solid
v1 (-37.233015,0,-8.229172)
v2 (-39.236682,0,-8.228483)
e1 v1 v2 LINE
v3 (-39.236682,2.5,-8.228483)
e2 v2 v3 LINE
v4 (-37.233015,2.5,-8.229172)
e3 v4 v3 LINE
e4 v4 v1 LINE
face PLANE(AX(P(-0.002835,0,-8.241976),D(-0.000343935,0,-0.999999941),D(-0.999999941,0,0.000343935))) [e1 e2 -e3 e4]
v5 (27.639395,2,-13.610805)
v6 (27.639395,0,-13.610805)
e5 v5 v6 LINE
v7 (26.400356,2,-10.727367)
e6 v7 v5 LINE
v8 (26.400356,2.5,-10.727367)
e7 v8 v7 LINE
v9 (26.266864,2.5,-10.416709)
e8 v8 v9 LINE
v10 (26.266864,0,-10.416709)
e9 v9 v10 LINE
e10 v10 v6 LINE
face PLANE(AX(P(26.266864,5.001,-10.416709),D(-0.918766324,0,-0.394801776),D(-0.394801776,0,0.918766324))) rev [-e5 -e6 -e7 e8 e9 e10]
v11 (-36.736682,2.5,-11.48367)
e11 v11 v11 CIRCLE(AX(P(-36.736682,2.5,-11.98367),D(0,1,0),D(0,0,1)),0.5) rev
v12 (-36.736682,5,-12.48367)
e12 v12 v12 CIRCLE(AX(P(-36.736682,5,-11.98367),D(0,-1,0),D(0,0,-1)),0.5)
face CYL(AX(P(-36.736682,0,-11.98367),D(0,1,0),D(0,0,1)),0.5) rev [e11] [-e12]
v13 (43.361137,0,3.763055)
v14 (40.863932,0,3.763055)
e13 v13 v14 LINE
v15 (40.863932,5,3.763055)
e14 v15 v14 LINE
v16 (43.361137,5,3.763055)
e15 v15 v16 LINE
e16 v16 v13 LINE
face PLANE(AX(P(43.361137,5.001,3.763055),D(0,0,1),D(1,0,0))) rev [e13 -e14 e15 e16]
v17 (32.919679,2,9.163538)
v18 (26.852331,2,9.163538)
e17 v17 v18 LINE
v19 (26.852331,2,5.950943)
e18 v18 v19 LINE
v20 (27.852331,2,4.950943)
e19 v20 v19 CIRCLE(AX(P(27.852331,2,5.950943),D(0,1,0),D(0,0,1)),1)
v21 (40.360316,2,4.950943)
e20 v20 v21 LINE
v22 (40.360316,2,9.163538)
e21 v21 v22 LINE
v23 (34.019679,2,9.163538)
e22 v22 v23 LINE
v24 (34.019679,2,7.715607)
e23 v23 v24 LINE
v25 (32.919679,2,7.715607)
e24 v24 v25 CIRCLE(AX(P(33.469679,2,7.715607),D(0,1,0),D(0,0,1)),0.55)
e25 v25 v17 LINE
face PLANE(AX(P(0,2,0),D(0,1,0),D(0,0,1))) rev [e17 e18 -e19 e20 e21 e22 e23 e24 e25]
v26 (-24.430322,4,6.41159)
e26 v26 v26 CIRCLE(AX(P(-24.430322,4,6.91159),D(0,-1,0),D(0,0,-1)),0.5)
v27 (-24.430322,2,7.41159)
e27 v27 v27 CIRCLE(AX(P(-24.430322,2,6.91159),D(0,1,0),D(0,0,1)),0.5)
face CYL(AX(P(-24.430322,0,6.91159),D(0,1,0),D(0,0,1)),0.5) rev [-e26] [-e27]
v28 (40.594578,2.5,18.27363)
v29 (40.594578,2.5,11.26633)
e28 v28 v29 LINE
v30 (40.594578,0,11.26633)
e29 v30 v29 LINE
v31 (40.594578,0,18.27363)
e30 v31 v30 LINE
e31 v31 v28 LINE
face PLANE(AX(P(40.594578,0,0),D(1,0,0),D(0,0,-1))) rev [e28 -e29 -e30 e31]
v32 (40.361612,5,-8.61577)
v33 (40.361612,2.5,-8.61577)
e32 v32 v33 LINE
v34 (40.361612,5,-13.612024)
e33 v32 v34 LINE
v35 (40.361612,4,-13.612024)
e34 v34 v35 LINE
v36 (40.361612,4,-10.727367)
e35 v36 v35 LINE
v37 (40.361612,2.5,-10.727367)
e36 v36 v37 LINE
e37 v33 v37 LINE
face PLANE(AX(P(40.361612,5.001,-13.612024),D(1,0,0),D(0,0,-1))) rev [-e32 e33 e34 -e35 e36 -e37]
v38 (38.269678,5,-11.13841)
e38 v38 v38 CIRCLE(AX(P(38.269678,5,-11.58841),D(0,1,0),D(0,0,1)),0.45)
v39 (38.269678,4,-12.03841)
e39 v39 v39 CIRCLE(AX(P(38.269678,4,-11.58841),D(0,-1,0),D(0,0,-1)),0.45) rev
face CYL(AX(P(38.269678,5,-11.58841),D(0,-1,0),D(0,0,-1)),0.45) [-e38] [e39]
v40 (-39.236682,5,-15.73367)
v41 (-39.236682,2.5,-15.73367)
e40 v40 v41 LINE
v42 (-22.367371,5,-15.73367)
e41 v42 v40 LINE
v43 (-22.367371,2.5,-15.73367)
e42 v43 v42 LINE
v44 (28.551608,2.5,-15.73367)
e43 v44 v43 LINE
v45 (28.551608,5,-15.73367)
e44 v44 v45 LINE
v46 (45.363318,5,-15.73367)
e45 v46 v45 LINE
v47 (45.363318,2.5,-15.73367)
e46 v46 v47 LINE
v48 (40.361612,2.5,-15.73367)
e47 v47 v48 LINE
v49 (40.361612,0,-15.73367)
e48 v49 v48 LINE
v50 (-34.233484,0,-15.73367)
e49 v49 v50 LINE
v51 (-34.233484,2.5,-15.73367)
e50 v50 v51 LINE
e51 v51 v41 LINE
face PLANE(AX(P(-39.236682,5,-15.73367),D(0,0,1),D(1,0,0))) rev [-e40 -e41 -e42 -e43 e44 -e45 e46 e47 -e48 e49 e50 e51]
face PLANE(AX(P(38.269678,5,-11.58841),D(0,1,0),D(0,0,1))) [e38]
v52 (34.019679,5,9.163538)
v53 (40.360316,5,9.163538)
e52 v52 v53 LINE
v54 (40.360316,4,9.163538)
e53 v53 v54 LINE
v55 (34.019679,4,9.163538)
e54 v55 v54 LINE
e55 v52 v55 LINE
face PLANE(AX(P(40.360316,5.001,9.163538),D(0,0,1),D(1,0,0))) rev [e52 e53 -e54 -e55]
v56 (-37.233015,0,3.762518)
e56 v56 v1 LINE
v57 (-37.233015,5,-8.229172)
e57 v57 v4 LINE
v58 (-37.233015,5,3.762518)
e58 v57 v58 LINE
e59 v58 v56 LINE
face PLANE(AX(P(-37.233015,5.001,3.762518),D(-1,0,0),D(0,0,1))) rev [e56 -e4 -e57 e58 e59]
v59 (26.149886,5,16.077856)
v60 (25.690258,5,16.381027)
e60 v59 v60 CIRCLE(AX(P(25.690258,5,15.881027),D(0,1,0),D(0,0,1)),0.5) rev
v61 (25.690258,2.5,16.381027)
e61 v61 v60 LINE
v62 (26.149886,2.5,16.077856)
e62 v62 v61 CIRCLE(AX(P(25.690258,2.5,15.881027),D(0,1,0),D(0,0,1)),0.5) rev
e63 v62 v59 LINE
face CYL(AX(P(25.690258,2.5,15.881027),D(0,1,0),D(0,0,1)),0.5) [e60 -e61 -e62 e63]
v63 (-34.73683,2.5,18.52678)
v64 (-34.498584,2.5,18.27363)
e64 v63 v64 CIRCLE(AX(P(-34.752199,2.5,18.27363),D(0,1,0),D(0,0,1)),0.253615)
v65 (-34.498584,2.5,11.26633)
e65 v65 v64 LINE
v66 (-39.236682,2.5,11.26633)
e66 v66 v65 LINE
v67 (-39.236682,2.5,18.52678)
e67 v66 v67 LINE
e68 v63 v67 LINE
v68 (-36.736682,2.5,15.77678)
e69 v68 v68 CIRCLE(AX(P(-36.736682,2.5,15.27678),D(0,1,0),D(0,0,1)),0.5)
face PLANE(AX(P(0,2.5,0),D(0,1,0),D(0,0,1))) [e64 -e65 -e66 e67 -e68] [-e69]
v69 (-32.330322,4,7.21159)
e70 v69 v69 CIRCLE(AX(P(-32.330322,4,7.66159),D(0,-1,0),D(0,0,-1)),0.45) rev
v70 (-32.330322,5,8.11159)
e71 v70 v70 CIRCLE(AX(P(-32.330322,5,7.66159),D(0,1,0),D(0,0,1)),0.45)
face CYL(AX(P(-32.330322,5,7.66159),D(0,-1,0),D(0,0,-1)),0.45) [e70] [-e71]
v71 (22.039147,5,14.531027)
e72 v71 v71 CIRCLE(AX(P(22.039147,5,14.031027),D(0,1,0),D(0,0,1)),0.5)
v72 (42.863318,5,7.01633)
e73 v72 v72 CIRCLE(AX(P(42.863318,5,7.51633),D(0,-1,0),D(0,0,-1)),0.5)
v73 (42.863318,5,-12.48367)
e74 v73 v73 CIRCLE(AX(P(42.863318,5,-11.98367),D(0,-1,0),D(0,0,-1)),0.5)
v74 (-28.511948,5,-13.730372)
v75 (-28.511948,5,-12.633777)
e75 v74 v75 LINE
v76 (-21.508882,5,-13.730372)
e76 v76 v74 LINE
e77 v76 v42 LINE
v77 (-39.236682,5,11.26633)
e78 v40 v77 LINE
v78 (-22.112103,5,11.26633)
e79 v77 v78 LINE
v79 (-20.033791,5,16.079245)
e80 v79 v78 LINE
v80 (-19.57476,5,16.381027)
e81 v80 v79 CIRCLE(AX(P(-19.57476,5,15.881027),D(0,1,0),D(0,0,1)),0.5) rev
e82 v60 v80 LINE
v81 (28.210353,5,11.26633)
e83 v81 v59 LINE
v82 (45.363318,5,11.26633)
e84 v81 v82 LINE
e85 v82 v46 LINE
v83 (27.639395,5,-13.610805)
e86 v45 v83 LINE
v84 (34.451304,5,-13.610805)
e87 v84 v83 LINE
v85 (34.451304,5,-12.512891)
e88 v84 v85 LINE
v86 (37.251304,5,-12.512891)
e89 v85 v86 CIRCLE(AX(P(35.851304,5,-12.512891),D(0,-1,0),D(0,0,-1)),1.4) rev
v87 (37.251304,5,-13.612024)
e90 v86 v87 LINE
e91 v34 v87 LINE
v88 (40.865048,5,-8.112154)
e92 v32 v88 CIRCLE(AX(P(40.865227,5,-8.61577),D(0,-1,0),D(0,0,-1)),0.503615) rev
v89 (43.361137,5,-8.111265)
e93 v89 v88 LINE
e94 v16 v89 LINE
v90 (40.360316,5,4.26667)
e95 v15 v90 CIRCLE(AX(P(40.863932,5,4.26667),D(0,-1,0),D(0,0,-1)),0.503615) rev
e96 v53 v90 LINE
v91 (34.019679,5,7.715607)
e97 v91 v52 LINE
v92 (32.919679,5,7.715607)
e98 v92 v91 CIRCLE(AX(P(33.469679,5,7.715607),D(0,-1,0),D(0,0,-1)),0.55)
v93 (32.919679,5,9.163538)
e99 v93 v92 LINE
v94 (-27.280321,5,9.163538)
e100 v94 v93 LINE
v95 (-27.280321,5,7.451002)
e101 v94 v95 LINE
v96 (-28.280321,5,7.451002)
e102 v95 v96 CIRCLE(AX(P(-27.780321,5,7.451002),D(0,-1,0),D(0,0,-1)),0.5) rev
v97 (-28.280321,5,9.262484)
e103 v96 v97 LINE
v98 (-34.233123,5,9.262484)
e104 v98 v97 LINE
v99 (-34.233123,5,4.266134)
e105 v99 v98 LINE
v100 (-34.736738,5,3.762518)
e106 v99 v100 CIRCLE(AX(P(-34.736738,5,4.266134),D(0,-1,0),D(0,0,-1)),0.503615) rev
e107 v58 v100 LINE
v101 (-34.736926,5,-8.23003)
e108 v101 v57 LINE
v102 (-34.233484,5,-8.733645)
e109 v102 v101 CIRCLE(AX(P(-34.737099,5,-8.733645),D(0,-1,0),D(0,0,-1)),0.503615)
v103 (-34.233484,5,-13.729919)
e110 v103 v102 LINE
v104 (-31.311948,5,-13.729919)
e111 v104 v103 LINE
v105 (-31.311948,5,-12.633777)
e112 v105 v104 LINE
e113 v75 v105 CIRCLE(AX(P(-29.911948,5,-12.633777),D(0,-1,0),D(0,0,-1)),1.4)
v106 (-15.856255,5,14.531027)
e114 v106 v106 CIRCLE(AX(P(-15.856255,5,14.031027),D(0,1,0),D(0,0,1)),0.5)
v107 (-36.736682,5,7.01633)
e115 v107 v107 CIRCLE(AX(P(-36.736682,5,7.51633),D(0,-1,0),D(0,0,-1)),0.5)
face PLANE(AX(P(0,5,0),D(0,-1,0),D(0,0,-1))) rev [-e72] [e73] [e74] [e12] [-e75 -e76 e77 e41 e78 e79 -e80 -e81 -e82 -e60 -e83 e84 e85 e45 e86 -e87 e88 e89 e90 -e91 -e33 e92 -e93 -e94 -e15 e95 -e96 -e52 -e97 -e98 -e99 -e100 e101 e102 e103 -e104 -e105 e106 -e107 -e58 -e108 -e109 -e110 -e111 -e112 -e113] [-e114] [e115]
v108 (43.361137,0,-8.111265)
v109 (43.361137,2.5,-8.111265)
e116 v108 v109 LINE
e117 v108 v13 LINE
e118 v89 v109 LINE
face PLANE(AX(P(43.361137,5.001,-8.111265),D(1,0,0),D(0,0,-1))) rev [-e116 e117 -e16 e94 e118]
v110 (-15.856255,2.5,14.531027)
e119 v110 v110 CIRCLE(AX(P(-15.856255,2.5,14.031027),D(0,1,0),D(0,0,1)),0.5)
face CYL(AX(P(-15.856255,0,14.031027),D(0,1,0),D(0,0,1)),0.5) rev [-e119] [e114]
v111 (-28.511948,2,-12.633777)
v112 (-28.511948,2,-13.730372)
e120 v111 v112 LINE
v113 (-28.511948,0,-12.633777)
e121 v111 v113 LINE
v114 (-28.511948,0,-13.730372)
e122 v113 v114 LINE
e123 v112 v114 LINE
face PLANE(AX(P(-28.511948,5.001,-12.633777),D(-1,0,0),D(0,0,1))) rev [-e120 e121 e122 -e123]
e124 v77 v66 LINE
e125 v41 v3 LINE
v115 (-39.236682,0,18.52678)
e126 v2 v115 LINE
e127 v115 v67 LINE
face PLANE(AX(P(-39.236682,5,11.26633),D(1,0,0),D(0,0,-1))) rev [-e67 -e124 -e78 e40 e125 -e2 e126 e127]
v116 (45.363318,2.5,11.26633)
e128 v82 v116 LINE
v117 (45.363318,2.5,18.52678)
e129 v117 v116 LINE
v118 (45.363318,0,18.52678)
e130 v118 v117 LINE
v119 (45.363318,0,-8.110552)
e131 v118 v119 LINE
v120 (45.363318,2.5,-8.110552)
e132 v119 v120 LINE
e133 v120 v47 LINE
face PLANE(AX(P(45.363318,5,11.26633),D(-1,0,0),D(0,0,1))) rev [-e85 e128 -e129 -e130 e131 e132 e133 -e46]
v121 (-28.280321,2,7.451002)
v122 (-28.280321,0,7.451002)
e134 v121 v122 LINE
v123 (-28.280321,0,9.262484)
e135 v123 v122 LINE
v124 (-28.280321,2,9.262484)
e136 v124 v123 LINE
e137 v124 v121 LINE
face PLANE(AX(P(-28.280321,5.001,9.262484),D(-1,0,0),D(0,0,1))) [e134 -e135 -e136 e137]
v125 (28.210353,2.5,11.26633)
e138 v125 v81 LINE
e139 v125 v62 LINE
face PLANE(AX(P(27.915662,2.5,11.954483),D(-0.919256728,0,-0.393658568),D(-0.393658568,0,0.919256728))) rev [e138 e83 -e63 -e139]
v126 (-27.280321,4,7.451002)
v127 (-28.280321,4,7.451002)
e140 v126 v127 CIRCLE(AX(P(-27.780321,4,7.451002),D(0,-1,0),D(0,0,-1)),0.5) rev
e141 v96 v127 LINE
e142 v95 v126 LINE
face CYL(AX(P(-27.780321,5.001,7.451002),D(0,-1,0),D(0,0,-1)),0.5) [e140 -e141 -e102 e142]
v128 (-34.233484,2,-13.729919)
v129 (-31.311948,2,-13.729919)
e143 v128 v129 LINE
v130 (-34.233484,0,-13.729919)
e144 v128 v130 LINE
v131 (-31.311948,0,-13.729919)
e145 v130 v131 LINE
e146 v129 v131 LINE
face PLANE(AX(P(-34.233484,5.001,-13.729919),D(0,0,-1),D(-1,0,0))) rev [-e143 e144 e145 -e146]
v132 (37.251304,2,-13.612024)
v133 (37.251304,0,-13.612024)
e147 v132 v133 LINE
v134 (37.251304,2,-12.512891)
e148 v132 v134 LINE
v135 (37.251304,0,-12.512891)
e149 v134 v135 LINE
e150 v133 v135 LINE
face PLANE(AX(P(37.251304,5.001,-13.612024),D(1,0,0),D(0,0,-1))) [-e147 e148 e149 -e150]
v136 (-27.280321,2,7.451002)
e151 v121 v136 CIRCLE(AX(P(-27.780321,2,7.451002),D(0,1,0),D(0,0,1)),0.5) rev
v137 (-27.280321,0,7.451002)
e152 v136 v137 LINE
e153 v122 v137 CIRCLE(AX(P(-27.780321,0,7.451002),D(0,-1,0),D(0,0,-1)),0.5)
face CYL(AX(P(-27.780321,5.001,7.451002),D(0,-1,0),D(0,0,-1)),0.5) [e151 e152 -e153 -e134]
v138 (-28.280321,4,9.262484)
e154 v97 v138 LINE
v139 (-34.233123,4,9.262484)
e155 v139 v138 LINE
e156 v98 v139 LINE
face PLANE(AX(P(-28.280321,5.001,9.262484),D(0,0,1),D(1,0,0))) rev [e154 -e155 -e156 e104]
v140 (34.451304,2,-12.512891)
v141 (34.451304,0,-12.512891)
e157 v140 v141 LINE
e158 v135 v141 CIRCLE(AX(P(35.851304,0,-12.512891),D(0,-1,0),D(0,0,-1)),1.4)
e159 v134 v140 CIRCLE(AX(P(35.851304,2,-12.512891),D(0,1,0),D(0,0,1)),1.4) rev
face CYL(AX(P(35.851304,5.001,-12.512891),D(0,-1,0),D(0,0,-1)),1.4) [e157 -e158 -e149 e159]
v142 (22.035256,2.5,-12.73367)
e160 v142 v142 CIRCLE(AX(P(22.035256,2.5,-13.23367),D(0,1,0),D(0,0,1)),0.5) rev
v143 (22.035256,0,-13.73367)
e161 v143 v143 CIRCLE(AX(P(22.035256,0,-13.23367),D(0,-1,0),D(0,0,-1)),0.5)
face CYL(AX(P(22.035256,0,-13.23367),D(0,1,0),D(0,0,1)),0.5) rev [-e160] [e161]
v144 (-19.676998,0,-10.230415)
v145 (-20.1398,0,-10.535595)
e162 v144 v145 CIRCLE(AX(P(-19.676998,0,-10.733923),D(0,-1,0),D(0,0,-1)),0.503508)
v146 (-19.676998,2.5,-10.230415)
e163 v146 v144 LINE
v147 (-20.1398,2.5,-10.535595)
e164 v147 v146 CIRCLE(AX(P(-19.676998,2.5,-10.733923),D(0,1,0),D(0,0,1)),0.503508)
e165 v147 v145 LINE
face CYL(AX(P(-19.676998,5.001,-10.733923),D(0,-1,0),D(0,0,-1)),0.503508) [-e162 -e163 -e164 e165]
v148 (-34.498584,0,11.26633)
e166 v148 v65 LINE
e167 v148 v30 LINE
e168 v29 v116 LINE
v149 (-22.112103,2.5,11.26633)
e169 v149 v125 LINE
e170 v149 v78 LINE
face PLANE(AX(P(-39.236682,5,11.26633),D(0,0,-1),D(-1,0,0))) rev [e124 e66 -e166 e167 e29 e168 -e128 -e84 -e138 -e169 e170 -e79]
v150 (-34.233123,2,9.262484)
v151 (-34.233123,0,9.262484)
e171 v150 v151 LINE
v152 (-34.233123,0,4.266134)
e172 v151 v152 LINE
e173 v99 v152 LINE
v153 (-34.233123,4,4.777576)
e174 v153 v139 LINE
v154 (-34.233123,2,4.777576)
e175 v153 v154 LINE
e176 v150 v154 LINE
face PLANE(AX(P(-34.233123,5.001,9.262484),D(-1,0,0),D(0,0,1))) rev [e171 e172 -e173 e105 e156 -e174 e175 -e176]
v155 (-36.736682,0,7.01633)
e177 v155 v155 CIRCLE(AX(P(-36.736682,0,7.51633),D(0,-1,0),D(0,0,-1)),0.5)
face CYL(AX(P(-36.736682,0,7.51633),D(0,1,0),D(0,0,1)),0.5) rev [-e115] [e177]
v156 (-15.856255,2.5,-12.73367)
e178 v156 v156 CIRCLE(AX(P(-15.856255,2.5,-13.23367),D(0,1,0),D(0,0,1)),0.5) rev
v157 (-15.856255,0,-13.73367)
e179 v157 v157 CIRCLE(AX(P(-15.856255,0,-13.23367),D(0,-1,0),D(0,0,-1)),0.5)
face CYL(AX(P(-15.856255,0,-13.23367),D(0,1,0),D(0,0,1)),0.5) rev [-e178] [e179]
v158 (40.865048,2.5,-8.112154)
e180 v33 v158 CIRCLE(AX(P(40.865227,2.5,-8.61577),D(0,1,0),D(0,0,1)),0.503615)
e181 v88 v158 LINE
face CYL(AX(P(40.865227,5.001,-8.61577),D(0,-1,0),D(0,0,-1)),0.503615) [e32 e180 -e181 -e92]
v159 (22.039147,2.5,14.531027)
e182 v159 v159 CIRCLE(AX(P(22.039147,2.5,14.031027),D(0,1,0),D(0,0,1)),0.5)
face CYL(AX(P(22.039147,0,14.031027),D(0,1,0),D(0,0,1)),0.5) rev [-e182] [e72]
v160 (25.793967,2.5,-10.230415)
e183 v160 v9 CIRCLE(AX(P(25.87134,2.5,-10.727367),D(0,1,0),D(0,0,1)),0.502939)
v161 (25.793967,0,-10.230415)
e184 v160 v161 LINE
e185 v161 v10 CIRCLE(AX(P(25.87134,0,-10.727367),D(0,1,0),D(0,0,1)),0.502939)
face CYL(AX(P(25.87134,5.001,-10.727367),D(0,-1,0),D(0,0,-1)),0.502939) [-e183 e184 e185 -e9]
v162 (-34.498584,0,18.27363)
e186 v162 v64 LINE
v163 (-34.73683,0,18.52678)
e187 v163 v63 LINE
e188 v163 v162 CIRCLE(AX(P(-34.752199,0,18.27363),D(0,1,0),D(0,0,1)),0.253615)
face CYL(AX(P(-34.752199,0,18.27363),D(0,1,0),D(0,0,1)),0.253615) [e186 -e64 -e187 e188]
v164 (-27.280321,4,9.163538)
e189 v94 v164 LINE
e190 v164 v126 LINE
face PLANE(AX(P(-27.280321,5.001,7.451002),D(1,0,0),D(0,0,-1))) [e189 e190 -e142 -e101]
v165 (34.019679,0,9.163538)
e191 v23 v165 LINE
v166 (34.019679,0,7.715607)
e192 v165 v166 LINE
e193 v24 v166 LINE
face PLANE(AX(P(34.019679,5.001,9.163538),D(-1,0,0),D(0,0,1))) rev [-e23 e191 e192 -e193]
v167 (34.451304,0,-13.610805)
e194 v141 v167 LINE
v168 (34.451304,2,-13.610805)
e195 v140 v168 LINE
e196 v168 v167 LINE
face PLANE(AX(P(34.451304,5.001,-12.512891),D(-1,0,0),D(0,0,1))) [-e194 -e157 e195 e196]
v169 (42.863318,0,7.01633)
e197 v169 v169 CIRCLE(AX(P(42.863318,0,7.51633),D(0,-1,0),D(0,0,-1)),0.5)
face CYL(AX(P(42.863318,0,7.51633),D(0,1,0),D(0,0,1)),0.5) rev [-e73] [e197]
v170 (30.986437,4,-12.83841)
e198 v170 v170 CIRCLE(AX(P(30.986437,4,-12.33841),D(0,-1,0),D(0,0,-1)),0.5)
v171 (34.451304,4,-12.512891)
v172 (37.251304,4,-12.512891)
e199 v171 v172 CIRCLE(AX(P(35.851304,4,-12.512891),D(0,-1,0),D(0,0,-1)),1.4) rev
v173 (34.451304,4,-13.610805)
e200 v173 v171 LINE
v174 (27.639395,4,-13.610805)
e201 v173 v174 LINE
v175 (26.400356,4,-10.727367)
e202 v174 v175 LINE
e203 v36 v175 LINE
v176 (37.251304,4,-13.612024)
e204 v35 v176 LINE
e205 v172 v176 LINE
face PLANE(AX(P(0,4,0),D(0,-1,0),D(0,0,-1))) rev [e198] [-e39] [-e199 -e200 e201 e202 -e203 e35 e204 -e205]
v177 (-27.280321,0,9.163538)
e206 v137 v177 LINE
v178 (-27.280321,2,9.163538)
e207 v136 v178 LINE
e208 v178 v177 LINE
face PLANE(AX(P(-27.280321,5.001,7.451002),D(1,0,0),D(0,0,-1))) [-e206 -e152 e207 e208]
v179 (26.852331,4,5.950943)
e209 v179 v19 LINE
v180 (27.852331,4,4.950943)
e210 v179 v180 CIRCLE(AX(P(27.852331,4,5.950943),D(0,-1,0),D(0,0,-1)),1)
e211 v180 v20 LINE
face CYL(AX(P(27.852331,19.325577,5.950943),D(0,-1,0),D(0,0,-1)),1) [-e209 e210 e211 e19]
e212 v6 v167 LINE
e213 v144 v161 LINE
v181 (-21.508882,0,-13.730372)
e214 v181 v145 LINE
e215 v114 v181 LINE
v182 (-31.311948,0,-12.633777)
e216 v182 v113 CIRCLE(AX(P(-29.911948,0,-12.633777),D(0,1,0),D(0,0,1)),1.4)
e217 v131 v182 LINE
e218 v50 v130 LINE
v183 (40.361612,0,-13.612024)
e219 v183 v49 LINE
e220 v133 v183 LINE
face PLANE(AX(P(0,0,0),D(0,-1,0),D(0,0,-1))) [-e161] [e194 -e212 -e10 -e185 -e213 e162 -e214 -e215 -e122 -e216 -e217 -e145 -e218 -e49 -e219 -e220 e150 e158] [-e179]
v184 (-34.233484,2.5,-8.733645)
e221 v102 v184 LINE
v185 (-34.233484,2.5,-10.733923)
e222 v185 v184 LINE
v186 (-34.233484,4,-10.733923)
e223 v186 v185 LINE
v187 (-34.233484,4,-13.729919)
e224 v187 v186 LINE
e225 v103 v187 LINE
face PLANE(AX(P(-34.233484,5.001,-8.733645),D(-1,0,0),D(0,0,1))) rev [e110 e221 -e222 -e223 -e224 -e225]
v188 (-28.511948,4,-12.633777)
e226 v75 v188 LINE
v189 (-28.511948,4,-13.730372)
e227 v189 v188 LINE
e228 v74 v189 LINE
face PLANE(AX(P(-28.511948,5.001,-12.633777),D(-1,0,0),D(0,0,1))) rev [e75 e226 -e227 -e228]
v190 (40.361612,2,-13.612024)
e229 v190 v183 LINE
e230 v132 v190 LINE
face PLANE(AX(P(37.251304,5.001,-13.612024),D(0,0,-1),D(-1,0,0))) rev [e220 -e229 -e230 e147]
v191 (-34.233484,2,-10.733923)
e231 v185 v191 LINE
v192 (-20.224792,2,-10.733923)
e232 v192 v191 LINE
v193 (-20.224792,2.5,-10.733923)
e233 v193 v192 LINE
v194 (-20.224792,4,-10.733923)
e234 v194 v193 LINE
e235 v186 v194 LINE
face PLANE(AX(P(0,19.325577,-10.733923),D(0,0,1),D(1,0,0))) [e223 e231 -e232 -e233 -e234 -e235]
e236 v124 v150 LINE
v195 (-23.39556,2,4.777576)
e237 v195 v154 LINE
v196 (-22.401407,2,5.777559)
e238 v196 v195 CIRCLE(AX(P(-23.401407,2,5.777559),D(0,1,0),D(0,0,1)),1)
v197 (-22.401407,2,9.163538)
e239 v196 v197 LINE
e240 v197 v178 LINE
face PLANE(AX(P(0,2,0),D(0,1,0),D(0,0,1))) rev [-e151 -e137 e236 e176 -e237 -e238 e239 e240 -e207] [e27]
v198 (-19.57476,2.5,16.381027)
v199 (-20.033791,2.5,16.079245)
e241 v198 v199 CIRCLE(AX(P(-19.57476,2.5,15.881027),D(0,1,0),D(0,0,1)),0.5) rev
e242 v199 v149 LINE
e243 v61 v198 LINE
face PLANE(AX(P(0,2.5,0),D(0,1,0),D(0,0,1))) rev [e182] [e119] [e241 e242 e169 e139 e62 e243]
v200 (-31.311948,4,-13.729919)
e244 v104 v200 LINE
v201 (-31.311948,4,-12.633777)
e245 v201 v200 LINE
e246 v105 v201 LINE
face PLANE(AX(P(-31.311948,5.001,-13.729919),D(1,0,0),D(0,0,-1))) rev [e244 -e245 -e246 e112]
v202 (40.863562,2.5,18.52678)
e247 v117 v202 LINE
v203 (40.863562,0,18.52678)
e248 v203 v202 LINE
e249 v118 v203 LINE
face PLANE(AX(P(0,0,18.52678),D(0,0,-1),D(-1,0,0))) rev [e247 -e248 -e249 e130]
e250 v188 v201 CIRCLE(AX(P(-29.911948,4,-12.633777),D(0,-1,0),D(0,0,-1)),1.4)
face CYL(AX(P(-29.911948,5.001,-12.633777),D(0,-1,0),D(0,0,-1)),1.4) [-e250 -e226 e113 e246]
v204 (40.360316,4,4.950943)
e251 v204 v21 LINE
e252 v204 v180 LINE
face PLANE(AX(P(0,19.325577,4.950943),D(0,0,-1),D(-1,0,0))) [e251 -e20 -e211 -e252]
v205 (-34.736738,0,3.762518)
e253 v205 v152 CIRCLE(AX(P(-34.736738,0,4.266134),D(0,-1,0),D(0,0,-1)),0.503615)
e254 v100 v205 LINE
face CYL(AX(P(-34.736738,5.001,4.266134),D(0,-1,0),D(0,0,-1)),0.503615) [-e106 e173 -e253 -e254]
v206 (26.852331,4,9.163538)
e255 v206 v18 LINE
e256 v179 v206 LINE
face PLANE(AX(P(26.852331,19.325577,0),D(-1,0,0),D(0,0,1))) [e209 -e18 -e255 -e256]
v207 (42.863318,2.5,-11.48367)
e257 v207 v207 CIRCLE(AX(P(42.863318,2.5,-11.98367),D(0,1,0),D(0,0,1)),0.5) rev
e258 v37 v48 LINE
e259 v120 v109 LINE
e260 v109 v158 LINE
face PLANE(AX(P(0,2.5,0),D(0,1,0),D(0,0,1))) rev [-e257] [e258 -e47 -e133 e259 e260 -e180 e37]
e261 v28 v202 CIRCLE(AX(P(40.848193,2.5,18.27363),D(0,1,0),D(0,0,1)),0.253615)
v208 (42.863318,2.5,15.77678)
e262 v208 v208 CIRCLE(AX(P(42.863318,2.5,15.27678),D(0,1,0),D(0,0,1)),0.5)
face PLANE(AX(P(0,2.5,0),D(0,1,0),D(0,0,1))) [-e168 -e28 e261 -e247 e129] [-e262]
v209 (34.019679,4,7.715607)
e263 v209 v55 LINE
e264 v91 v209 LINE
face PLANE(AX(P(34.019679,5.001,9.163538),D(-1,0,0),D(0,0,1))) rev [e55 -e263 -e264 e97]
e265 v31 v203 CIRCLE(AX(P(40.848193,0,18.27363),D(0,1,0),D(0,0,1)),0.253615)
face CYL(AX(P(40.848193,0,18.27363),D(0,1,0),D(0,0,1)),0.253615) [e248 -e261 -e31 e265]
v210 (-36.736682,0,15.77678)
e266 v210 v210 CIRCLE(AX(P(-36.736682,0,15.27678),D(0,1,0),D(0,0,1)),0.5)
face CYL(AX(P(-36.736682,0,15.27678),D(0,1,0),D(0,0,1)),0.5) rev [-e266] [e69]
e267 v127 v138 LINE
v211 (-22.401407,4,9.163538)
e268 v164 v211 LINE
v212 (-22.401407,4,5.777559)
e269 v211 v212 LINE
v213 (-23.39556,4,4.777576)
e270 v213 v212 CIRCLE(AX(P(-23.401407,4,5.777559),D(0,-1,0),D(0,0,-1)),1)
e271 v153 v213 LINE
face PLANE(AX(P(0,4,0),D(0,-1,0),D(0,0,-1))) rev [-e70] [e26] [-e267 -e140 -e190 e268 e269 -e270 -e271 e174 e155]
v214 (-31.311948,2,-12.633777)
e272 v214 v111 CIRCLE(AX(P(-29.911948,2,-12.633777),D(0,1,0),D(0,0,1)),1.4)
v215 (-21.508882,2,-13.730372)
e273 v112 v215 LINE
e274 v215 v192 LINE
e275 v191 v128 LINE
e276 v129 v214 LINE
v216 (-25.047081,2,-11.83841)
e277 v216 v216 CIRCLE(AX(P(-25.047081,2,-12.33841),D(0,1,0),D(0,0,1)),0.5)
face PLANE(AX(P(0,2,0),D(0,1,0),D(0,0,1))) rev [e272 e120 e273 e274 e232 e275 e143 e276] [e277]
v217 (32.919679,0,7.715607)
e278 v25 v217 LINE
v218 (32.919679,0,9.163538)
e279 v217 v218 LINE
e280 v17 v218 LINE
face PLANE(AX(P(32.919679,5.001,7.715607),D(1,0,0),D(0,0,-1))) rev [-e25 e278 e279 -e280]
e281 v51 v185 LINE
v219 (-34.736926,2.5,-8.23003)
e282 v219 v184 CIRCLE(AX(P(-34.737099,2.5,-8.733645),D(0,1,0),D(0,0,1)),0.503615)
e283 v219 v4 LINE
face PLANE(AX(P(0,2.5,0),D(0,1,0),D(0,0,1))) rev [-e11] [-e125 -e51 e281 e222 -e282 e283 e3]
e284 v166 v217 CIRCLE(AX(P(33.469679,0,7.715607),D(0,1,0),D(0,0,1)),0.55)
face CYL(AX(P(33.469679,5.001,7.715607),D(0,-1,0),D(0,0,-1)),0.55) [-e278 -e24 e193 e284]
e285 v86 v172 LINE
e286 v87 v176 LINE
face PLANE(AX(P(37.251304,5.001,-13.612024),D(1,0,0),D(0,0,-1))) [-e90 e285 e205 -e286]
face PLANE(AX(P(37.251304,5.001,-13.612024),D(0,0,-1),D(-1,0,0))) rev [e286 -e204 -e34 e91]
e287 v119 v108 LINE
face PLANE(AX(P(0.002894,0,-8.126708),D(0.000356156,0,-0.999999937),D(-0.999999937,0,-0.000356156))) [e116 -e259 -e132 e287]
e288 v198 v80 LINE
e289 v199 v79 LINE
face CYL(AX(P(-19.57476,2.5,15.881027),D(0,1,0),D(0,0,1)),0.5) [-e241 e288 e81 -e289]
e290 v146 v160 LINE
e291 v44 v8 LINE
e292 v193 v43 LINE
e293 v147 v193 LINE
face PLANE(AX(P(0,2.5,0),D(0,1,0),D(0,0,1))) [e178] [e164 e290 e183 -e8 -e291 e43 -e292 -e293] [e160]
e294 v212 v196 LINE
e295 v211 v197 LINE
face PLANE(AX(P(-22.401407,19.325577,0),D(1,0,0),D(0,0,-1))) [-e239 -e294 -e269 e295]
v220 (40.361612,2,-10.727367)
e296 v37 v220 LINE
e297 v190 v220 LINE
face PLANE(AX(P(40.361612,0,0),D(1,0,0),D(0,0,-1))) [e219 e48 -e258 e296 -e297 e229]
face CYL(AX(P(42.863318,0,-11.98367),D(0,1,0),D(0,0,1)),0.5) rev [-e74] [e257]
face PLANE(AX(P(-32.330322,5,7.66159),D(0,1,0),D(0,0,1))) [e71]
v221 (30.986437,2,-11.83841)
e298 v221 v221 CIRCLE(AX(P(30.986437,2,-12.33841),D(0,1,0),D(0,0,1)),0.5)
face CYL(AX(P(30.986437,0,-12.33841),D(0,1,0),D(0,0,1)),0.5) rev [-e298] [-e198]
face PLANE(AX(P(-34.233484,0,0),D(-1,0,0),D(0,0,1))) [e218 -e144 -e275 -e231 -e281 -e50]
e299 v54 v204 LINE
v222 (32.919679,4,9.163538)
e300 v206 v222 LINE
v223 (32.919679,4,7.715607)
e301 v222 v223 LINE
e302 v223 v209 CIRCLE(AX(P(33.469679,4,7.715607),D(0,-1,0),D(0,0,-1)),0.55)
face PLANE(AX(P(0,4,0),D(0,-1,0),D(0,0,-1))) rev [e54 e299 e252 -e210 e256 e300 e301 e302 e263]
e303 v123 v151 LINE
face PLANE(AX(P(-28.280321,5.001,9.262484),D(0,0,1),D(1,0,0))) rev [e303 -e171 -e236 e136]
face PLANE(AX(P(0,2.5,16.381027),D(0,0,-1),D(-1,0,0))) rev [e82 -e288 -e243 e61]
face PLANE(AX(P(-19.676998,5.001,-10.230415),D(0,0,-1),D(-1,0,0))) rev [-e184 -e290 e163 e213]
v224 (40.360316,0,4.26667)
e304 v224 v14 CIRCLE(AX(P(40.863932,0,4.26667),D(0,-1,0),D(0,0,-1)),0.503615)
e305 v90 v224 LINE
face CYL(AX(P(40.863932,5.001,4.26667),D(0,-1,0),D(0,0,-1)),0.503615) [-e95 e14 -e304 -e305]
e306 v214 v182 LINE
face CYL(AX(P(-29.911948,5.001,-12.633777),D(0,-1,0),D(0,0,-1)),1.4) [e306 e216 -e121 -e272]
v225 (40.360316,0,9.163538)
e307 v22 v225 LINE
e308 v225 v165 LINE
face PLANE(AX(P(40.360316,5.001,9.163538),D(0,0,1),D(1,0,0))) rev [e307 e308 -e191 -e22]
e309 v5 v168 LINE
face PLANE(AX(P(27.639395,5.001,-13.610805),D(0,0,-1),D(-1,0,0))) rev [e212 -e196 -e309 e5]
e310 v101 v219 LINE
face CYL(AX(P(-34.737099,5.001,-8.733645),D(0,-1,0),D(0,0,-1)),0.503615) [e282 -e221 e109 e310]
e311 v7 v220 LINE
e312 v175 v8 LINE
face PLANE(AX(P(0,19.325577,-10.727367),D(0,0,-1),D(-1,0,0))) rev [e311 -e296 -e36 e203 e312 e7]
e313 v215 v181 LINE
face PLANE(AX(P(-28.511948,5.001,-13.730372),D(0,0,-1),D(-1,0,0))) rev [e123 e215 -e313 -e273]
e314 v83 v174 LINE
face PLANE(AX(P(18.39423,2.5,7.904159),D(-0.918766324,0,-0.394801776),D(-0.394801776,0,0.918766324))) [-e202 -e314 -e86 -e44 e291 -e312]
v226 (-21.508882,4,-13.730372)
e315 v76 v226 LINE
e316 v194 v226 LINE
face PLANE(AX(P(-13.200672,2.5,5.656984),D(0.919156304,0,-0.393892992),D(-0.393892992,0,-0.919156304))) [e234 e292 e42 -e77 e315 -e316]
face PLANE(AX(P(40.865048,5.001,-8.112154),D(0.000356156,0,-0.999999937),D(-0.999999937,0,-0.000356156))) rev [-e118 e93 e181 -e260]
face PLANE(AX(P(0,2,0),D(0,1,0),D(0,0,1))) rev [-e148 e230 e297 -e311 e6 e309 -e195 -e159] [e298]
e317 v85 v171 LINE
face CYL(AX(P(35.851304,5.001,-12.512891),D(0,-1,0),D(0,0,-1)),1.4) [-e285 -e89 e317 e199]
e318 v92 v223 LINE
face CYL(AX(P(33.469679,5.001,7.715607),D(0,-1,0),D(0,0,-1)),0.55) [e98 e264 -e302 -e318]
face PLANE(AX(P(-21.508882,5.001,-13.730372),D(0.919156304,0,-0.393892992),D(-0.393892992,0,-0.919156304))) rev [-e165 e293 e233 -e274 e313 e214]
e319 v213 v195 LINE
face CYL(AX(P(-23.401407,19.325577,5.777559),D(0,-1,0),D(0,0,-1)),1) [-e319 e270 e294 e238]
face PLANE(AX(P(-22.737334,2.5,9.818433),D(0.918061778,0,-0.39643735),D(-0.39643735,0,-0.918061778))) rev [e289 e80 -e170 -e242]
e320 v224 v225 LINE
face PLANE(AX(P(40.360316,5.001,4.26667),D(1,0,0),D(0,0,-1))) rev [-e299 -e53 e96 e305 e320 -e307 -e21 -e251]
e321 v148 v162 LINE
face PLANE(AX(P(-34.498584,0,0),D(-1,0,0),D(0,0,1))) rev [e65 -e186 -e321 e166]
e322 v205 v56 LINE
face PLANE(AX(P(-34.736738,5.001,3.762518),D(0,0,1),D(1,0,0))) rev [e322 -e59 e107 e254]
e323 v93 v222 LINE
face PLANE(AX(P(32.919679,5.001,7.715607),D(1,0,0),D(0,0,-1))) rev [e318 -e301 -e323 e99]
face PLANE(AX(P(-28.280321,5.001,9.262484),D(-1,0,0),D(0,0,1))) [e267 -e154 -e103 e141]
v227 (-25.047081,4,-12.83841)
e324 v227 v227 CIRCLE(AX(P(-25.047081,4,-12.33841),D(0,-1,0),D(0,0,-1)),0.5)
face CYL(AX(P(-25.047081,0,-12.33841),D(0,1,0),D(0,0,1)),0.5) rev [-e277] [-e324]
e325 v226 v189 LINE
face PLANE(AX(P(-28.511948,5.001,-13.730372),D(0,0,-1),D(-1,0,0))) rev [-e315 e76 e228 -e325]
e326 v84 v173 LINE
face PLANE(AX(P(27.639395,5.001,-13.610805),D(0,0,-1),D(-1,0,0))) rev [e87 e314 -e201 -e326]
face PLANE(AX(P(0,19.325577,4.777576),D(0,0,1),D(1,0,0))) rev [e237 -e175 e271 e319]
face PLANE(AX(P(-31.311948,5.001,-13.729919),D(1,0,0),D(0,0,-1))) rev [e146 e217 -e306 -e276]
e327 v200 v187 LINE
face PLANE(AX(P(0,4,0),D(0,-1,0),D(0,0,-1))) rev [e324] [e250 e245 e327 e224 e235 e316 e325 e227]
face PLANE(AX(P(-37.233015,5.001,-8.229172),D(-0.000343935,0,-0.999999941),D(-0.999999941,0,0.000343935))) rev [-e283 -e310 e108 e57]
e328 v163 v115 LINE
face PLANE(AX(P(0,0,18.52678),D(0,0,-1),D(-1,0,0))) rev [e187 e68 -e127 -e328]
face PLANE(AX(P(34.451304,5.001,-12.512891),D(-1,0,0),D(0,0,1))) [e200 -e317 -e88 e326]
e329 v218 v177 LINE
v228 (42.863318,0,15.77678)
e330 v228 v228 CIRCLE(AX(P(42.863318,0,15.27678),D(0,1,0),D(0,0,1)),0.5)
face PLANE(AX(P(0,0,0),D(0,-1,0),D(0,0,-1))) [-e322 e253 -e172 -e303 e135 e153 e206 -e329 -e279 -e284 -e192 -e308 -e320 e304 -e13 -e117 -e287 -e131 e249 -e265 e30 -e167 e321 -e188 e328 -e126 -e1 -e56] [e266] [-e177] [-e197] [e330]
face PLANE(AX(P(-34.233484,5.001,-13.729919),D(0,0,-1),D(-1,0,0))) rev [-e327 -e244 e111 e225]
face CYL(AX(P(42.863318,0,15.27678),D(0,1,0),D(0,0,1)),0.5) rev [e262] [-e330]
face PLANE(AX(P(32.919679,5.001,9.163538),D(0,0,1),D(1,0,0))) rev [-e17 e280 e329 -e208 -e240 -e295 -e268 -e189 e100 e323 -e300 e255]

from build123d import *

# Parameters (mm, degrees)
SKETCH1_W                = 84.6
SKETCH1_H                = 27
BOSS_EXTRUDE1_DEPTH      = 5
CUT_EXTRUDE1_REACH       = 50.274
BOSS_EXTRUDE3_START      = 2
BOSS_EXTRUDE3_DEPTH      = 2
CUT_EXTRUDE3_START       = -2.5
CUT_EXTRUDE3_DEPTH       = 2.5
CUT_EXTRUDE5_START       = -2.5
CUT_EXTRUDE5_DEPTH       = 46.773999335
BOSS_EXTRUDE4_DEPTH      = 2.5
BOSS_EXTRUDE5_START      = -2.5
BOSS_EXTRUDE5_DEPTH      = 2.5
CUT_EXTRUDE2_OUTLINE_R   = 0.5
CUT_EXTRUDE2_OUTLINE_R_2 = 0.499999992
CUT_EXTRUDE2_DEPTH       = 5
SKETCH15_R               = 0.5
CUT_EXTRUDE6_DEPTH       = 50.255349811
SKETCH16_R               = 0.45
BOSS_EXTRUDE6_DEPTH      = 1


# Read off the part's stored shape, not the designer's step: Cut-Extrude2
with BuildPart() as part:
    # Sketch1 → Boss-Extrude1 (new body)
    with BuildSketch(Plane(origin=(0, 0, 0), x_dir=(1, 0, 0), z_dir=(0, 1, 0))):
        with Locations((3.06331835, 2.23366963)):
            Rectangle(SKETCH1_W, SKETCH1_H)
    extrude(amount=BOSS_EXTRUDE1_DEPTH)

    # Sketch3 → Cut-Extrude1 (cut, up to next)
    with BuildSketch(Plane(origin=(0, 0, 0), x_dir=(1, 0, 0), z_dir=(0, 1, 0)), mode=Mode.PRIVATE) as cut_extrude1_sk1:
        with BuildLine():
            Line((32.919678843, -9.163538235), (-27.280321157, -9.163538235))
            Line((-27.280321157, -9.163538235), (-27.280321157, -7.45100236))
            ThreePointArc((-27.280321157, -7.45100236), (-27.780321157, -6.95100236), (-28.280321157, -7.45100236))
            Line((-28.280321157, -7.45100236), (-28.280321157, -9.262483826))
            Line((-28.280321157, -9.262483826), (-34.233122665, -9.262483826))
            Line((-34.233122665, -9.262483826), (-34.233122665, -4.266133774))
            ThreePointArc((-34.233122665, -4.266133774), (-34.380628165, -3.910023997), (-34.736737941, -3.762518498))
            Line((-34.736737941, -3.762518498), (-37.233015401, -3.762518498))
            Line((-37.233015401, -3.762518498), (-37.233015401, 8.229171698))
            Line((-37.233015401, 8.229171698), (-34.736926038, 8.23003019))
            ThreePointArc((-34.736926038, 8.23003019), (-34.380928238, 8.377596904), (-34.233483972, 8.733645436))
            Line((-34.233483972, 8.733645436), (-34.233483972, 13.729919004))
            Line((-34.233483972, 13.729919004), (-31.31194803, 13.729919004))
            Line((-31.31194803, 13.729919004), (-31.31194803, 12.633776758))
            ThreePointArc((-31.31194803, 12.633776758), (-29.91194803, 11.233776758), (-28.51194803, 12.633776758))
            Line((-28.51194803, 12.633776758), (-28.51194803, 13.730371923))
            Line((-28.51194803, 13.730371923), (-21.508882253, 13.730371923))
            Line((-21.508882253, 13.730371923), (-20.139800412, 10.535595096))
            ThreePointArc((-20.139800412, 10.535595096), (-19.954180397, 10.31357804), (-19.676997597, 10.230415195))
            Line((-19.676997597, 10.230415195), (25.793967371, 10.230415195))
            ThreePointArc((25.793967371, 10.230415195), (26.055680662, 10.259428791), (26.266864173, 10.416709306))
            Line((26.266864173, 10.416709306), (27.639394616, 13.61080525))
            Line((27.639394616, 13.61080525), (34.4513038, 13.61080525))
            Line((34.4513038, 13.61080525), (34.4513038, 12.512891353))
            ThreePointArc((34.4513038, 12.512891353), (35.8513038, 11.112891353), (37.2513038, 12.512891353))
            Line((37.2513038, 12.512891353), (37.2513038, 13.612023992))
            Line((37.2513038, 13.612023992), (40.361611802, 13.612023992))
            Line((40.361611802, 13.612023992), (40.361611802, 8.61576965))
            ThreePointArc((40.361611802, 8.61576965), (40.509053891, 8.259723294), (40.865047712, 8.112154406))
            Line((40.865047712, 8.112154406), (43.361137065, 8.111265408))
            Line((43.361137065, 8.111265408), (43.361137065, -3.763055079))
            Line((43.361137065, -3.763055079), (40.86393165, -3.763055079))
            ThreePointArc((40.86393165, -3.763055079), (40.507821873, -3.910560578), (40.360316374, -4.266670355))
            Line((40.360316374, -4.266670355), (40.360316374, -9.163538235))
            Line((40.360316374, -9.163538235), (34.019678843, -9.163538235))
            Line((34.019678843, -9.163538235), (34.019678843, -7.715606668))
            ThreePointArc((34.019678843, -7.715606668), (33.469678843, -7.165606668), (32.919678843, -7.715606668))
            Line((32.919678843, -7.715606668), (32.919678843, -9.163538235))
        make_face()
    cut_extrude1_tool1 = extrude(cut_extrude1_sk1.sketch, amount=CUT_EXTRUDE1_REACH, mode=Mode.PRIVATE) & part.part
    add(cut_extrude1_tool1.solids().sort_by_distance((3.012517, 0, -1.196465))[0], mode=Mode.SUBTRACT)

    # Sketch3<5> → Boss-Extrude3 (add)
    with BuildSketch(Plane(origin=(0, 0, 0), x_dir=(1, 0, 0), z_dir=(0, 1, 0)).offset(BOSS_EXTRUDE3_START)):
        with BuildLine():
            Line((26.852330657, -9.163538235), (32.919678843, -9.163538235))
            Line((32.919678843, -9.163538235), (32.919678843, -7.715606668))
            ThreePointArc((32.919678843, -7.715606668), (33.469678843, -7.165606668), (34.019678843, -7.715606668))
            Line((34.019678843, -7.715606668), (34.019678843, -9.163538235))
            Line((34.019678843, -9.163538235), (40.360316374, -9.163538235))
            Line((40.360316374, -9.163538235), (40.360316374, -4.950942773))
            Line((40.360316374, -4.950942773), (27.852330657, -4.950942773))
            ThreePointArc((27.852330657, -4.950942773), (27.145223876, -5.243835992), (26.852330657, -5.950942773))
            Line((26.852330657, -5.950942773), (26.852330657, -9.163538235))
        make_face()
        with BuildLine():
            Line((-27.280321157, -9.163538235), (-22.401406955, -9.163538235))
            Line((-22.401406955, -9.163538235), (-22.401406955, -5.777559213))
            ThreePointArc((-22.401406955, -5.777559213), (-22.692236098, -5.07252255), (-23.395560348, -4.777576304))
            Line((-23.395560348, -4.777576304), (-34.233122665, -4.777576304))
            Line((-34.233122665, -4.777576304), (-34.233122665, -9.262483826))
            Line((-34.233122665, -9.262483826), (-28.280321157, -9.262483826))
            Line((-28.280321157, -9.262483826), (-28.280321157, -7.45100236))
            ThreePointArc((-28.280321157, -7.45100236), (-27.780321157, -6.95100236), (-27.280321157, -7.45100236))
            Line((-27.280321157, -7.45100236), (-27.280321157, -9.163538235))
        make_face()
        with BuildLine():
            Line((26.400356299, 10.727366647), (40.361611802, 10.727366647))
            Line((40.361611802, 10.727366647), (40.361611802, 13.612023992))
            Line((40.361611802, 13.612023992), (37.2513038, 13.612023992))
            Line((37.2513038, 13.612023992), (37.2513038, 12.512891353))
            ThreePointArc((37.2513038, 12.512891353), (35.8513038, 11.112891353), (34.4513038, 12.512891353))
            Line((34.4513038, 12.512891353), (34.4513038, 13.61080525))
            Line((34.4513038, 13.61080525), (27.639394616, 13.61080525))
            Line((27.639394616, 13.61080525), (26.400356299, 10.727366647))
        make_face()
        with BuildLine():
            Line((-34.233483972, 13.729919004), (-34.233483972, 10.733923481))
            Line((-34.233483972, 10.733923481), (-20.224791573, 10.733923481))
            Line((-20.224791573, 10.733923481), (-21.508882253, 13.730371923))
            Line((-21.508882253, 13.730371923), (-28.51194803, 13.730371923))
            Line((-28.51194803, 13.730371923), (-28.51194803, 12.633776758))
            ThreePointArc((-28.51194803, 12.633776758), (-29.91194803, 11.233776758), (-31.31194803, 12.633776758))
            Line((-31.31194803, 12.633776758), (-31.31194803, 13.729919004))
            Line((-31.31194803, 13.729919004), (-34.233483972, 13.729919004))
        make_face()
    extrude(amount=BOSS_EXTRUDE3_DEPTH)

    # Sketch13 → Cut-Extrude3 (cut)
    with BuildSketch(Plane(origin=(0, 5, 0), x_dir=(1, 0, 0), z_dir=(0, 1, 0)).offset(CUT_EXTRUDE3_START)):
        with BuildLine():
            Line((-22.367370549, 15.73366963), (-20.139800412, 10.535595096))
            ThreePointArc((-20.139800412, 10.535595096), (-19.954180397, 10.31357804), (-19.676997597, 10.230415195))
            Line((-19.676997597, 10.230415195), (25.793967371, 10.230415195))
            ThreePointArc((25.793967371, 10.230415195), (26.055680662, 10.259428791), (26.266864173, 10.416709306))
            Line((26.266864173, 10.416709306), (28.551607662, 15.73366963))
            Line((28.551607662, 15.73366963), (-22.367370549, 15.73366963))
        make_face()
    extrude(amount=CUT_EXTRUDE3_DEPTH, mode=Mode.SUBTRACT)

    # Sketch13<4> → Cut-Extrude5 (cut, through all)
    with BuildSketch(Plane(origin=(0, 5, 0), x_dir=(1, 0, 0), z_dir=(0, 1, 0)).offset(CUT_EXTRUDE5_START)):
        with BuildLine():
            Line((-34.233483972, 8.733645436), (-34.233483972, 15.73366963))
            Line((-34.233483972, 15.73366963), (-39.23668165, 15.73366963))
            Line((-39.23668165, 15.73366963), (-39.23668165, 8.228482568))
            Line((-39.23668165, 8.228482568), (-34.736926038, 8.23003019))
            ThreePointArc((-34.736926038, 8.23003019), (-34.380928238, 8.377596904), (-34.233483972, 8.733645436))
        make_face()
        with BuildLine():
            Line((45.36331835, 8.110552318), (45.36331835, 15.73366963))
            Line((45.36331835, 15.73366963), (40.361611802, 15.73366963))
            Line((40.361611802, 15.73366963), (40.361611802, 8.61576965))
            ThreePointArc((40.361611802, 8.61576965), (40.509053891, 8.259723294), (40.865047712, 8.112154406))
            Line((40.865047712, 8.112154406), (45.36331835, 8.110552318))
        make_face()
    extrude(amount=-CUT_EXTRUDE5_DEPTH, mode=Mode.SUBTRACT)

    # Sketch13<7> → Boss-Extrude4 (add)
    with BuildSketch(Plane(origin=(0, 5, 0), x_dir=(1, 0, 0), z_dir=(0, 1, 0))):
        with BuildLine():
            Line((26.149886209, -16.077855955), (28.210353336, -11.26633037))
            Line((28.210353336, -11.26633037), (-22.112103374, -11.26633037))
            Line((-22.112103374, -11.26633037), (-20.033790882, -16.079245346))
            ThreePointArc((-20.033790882, -16.079245346), (-19.849433129, -16.298824073), (-19.574759994, -16.381026671))
            Line((-19.574759994, -16.381026671), (25.690257845, -16.381026671))
            ThreePointArc((25.690257845, -16.381026671), (25.965562547, -16.298408177), (26.149886209, -16.077855955))
        make_face()
    extrude(amount=-BOSS_EXTRUDE4_DEPTH)

    # Sketch13<8> → Boss-Extrude5 (add)
    with BuildSketch(Plane(origin=(0, 5, 0), x_dir=(1, 0, 0), z_dir=(0, 1, 0)).offset(BOSS_EXTRUDE5_START)):
        with BuildLine():
            Line((-34.498583653, -18.273630424), (-34.498583653, -11.26633037))
            Line((-34.498583653, -11.26633037), (-39.23668165, -11.26633037))
            Line((-39.23668165, -11.26633037), (-39.23668165, -18.526779589))
            Line((-39.23668165, -18.526779589), (-34.736829858, -18.526779589))
            ThreePointArc((-34.736829858, -18.526779589), (-34.567511978, -18.447444803), (-34.498583653, -18.273630424))
        make_face()
        with BuildLine():
            Line((45.36331835, -11.26633037), (40.594578125, -11.26633037))
            Line((40.594578125, -11.26633037), (40.594578125, -18.273630424))
            ThreePointArc((40.594578125, -18.273630424), (40.674379022, -18.458317374), (40.863562472, -18.526779589))
            Line((40.863562472, -18.526779589), (45.36331835, -18.526779589))
            Line((45.36331835, -18.526779589), (45.36331835, -11.26633037))
        make_face()
    extrude(amount=-BOSS_EXTRUDE5_DEPTH)

    # Cut-Extrude2 outline → Cut-Extrude2 (cut)
    with BuildSketch(Plane.XZ.offset(-5)):
        with Locations((30.98643714, -12.338409577)):
            Circle(CUT_EXTRUDE2_OUTLINE_R)
        with Locations((-25.04708137, -12.338409577)):
            Circle(CUT_EXTRUDE2_OUTLINE_R)
        with Locations((-24.430322115, 6.911590423)):
            Circle(CUT_EXTRUDE2_OUTLINE_R)
        with Locations((-36.73668165, -11.98366963)):
            Circle(CUT_EXTRUDE2_OUTLINE_R)
        with Locations((-15.856255457, -13.23366963)):
            Circle(CUT_EXTRUDE2_OUTLINE_R)
        with Locations((22.035256025, -13.23366963)):
            Circle(CUT_EXTRUDE2_OUTLINE_R_2)
        with Locations((42.86331835, -11.98366963)):
            Circle(CUT_EXTRUDE2_OUTLINE_R)
        with Locations((-36.73668165, 7.51633037)):
            Circle(CUT_EXTRUDE2_OUTLINE_R)
        with Locations((42.86331835, 7.51633037)):
            Circle(CUT_EXTRUDE2_OUTLINE_R)
    extrude(amount=CUT_EXTRUDE2_DEPTH, mode=Mode.SUBTRACT)

    # Sketch15 → Cut-Extrude6 (cut, through all)
    with BuildSketch(Plane(origin=(0, 5, 0), x_dir=(1, 0, 0), z_dir=(0, 1, 0))):
        with Locations(Location((-15.856255457, -14.031026671, 0), (0, 0, 270))):
            Circle(SKETCH15_R)
        with Locations(Location((22.039147194, -14.031026671, 0), (0, 0, 270))):
            Circle(SKETCH15_R)
        with Locations(Location((-36.73668165, -15.276779589, 0), (0, 0, 270))):
            Circle(SKETCH15_R)
        with Locations(Location((42.86331835, -15.276779589, 0), (0, 0, 270))):
            Circle(SKETCH15_R)
    extrude(amount=-CUT_EXTRUDE6_DEPTH, mode=Mode.SUBTRACT)

    # Sketch16 → Boss-Extrude6 (add)
    with BuildSketch(Plane(origin=(0, 4, 0), x_dir=(1, 0, 0), z_dir=(0, 1, 0))):
        with Locations(Location((38.269677885, 11.588409577, 0), (0, 0, 90))):
            Circle(SKETCH16_R)
        with Locations(Location((-32.330322115, -7.661590423, 0), (0, 0, 90))):
            Circle(SKETCH16_R)
    extrude(amount=BOSS_EXTRUDE6_DEPTH)


solid = part.part
